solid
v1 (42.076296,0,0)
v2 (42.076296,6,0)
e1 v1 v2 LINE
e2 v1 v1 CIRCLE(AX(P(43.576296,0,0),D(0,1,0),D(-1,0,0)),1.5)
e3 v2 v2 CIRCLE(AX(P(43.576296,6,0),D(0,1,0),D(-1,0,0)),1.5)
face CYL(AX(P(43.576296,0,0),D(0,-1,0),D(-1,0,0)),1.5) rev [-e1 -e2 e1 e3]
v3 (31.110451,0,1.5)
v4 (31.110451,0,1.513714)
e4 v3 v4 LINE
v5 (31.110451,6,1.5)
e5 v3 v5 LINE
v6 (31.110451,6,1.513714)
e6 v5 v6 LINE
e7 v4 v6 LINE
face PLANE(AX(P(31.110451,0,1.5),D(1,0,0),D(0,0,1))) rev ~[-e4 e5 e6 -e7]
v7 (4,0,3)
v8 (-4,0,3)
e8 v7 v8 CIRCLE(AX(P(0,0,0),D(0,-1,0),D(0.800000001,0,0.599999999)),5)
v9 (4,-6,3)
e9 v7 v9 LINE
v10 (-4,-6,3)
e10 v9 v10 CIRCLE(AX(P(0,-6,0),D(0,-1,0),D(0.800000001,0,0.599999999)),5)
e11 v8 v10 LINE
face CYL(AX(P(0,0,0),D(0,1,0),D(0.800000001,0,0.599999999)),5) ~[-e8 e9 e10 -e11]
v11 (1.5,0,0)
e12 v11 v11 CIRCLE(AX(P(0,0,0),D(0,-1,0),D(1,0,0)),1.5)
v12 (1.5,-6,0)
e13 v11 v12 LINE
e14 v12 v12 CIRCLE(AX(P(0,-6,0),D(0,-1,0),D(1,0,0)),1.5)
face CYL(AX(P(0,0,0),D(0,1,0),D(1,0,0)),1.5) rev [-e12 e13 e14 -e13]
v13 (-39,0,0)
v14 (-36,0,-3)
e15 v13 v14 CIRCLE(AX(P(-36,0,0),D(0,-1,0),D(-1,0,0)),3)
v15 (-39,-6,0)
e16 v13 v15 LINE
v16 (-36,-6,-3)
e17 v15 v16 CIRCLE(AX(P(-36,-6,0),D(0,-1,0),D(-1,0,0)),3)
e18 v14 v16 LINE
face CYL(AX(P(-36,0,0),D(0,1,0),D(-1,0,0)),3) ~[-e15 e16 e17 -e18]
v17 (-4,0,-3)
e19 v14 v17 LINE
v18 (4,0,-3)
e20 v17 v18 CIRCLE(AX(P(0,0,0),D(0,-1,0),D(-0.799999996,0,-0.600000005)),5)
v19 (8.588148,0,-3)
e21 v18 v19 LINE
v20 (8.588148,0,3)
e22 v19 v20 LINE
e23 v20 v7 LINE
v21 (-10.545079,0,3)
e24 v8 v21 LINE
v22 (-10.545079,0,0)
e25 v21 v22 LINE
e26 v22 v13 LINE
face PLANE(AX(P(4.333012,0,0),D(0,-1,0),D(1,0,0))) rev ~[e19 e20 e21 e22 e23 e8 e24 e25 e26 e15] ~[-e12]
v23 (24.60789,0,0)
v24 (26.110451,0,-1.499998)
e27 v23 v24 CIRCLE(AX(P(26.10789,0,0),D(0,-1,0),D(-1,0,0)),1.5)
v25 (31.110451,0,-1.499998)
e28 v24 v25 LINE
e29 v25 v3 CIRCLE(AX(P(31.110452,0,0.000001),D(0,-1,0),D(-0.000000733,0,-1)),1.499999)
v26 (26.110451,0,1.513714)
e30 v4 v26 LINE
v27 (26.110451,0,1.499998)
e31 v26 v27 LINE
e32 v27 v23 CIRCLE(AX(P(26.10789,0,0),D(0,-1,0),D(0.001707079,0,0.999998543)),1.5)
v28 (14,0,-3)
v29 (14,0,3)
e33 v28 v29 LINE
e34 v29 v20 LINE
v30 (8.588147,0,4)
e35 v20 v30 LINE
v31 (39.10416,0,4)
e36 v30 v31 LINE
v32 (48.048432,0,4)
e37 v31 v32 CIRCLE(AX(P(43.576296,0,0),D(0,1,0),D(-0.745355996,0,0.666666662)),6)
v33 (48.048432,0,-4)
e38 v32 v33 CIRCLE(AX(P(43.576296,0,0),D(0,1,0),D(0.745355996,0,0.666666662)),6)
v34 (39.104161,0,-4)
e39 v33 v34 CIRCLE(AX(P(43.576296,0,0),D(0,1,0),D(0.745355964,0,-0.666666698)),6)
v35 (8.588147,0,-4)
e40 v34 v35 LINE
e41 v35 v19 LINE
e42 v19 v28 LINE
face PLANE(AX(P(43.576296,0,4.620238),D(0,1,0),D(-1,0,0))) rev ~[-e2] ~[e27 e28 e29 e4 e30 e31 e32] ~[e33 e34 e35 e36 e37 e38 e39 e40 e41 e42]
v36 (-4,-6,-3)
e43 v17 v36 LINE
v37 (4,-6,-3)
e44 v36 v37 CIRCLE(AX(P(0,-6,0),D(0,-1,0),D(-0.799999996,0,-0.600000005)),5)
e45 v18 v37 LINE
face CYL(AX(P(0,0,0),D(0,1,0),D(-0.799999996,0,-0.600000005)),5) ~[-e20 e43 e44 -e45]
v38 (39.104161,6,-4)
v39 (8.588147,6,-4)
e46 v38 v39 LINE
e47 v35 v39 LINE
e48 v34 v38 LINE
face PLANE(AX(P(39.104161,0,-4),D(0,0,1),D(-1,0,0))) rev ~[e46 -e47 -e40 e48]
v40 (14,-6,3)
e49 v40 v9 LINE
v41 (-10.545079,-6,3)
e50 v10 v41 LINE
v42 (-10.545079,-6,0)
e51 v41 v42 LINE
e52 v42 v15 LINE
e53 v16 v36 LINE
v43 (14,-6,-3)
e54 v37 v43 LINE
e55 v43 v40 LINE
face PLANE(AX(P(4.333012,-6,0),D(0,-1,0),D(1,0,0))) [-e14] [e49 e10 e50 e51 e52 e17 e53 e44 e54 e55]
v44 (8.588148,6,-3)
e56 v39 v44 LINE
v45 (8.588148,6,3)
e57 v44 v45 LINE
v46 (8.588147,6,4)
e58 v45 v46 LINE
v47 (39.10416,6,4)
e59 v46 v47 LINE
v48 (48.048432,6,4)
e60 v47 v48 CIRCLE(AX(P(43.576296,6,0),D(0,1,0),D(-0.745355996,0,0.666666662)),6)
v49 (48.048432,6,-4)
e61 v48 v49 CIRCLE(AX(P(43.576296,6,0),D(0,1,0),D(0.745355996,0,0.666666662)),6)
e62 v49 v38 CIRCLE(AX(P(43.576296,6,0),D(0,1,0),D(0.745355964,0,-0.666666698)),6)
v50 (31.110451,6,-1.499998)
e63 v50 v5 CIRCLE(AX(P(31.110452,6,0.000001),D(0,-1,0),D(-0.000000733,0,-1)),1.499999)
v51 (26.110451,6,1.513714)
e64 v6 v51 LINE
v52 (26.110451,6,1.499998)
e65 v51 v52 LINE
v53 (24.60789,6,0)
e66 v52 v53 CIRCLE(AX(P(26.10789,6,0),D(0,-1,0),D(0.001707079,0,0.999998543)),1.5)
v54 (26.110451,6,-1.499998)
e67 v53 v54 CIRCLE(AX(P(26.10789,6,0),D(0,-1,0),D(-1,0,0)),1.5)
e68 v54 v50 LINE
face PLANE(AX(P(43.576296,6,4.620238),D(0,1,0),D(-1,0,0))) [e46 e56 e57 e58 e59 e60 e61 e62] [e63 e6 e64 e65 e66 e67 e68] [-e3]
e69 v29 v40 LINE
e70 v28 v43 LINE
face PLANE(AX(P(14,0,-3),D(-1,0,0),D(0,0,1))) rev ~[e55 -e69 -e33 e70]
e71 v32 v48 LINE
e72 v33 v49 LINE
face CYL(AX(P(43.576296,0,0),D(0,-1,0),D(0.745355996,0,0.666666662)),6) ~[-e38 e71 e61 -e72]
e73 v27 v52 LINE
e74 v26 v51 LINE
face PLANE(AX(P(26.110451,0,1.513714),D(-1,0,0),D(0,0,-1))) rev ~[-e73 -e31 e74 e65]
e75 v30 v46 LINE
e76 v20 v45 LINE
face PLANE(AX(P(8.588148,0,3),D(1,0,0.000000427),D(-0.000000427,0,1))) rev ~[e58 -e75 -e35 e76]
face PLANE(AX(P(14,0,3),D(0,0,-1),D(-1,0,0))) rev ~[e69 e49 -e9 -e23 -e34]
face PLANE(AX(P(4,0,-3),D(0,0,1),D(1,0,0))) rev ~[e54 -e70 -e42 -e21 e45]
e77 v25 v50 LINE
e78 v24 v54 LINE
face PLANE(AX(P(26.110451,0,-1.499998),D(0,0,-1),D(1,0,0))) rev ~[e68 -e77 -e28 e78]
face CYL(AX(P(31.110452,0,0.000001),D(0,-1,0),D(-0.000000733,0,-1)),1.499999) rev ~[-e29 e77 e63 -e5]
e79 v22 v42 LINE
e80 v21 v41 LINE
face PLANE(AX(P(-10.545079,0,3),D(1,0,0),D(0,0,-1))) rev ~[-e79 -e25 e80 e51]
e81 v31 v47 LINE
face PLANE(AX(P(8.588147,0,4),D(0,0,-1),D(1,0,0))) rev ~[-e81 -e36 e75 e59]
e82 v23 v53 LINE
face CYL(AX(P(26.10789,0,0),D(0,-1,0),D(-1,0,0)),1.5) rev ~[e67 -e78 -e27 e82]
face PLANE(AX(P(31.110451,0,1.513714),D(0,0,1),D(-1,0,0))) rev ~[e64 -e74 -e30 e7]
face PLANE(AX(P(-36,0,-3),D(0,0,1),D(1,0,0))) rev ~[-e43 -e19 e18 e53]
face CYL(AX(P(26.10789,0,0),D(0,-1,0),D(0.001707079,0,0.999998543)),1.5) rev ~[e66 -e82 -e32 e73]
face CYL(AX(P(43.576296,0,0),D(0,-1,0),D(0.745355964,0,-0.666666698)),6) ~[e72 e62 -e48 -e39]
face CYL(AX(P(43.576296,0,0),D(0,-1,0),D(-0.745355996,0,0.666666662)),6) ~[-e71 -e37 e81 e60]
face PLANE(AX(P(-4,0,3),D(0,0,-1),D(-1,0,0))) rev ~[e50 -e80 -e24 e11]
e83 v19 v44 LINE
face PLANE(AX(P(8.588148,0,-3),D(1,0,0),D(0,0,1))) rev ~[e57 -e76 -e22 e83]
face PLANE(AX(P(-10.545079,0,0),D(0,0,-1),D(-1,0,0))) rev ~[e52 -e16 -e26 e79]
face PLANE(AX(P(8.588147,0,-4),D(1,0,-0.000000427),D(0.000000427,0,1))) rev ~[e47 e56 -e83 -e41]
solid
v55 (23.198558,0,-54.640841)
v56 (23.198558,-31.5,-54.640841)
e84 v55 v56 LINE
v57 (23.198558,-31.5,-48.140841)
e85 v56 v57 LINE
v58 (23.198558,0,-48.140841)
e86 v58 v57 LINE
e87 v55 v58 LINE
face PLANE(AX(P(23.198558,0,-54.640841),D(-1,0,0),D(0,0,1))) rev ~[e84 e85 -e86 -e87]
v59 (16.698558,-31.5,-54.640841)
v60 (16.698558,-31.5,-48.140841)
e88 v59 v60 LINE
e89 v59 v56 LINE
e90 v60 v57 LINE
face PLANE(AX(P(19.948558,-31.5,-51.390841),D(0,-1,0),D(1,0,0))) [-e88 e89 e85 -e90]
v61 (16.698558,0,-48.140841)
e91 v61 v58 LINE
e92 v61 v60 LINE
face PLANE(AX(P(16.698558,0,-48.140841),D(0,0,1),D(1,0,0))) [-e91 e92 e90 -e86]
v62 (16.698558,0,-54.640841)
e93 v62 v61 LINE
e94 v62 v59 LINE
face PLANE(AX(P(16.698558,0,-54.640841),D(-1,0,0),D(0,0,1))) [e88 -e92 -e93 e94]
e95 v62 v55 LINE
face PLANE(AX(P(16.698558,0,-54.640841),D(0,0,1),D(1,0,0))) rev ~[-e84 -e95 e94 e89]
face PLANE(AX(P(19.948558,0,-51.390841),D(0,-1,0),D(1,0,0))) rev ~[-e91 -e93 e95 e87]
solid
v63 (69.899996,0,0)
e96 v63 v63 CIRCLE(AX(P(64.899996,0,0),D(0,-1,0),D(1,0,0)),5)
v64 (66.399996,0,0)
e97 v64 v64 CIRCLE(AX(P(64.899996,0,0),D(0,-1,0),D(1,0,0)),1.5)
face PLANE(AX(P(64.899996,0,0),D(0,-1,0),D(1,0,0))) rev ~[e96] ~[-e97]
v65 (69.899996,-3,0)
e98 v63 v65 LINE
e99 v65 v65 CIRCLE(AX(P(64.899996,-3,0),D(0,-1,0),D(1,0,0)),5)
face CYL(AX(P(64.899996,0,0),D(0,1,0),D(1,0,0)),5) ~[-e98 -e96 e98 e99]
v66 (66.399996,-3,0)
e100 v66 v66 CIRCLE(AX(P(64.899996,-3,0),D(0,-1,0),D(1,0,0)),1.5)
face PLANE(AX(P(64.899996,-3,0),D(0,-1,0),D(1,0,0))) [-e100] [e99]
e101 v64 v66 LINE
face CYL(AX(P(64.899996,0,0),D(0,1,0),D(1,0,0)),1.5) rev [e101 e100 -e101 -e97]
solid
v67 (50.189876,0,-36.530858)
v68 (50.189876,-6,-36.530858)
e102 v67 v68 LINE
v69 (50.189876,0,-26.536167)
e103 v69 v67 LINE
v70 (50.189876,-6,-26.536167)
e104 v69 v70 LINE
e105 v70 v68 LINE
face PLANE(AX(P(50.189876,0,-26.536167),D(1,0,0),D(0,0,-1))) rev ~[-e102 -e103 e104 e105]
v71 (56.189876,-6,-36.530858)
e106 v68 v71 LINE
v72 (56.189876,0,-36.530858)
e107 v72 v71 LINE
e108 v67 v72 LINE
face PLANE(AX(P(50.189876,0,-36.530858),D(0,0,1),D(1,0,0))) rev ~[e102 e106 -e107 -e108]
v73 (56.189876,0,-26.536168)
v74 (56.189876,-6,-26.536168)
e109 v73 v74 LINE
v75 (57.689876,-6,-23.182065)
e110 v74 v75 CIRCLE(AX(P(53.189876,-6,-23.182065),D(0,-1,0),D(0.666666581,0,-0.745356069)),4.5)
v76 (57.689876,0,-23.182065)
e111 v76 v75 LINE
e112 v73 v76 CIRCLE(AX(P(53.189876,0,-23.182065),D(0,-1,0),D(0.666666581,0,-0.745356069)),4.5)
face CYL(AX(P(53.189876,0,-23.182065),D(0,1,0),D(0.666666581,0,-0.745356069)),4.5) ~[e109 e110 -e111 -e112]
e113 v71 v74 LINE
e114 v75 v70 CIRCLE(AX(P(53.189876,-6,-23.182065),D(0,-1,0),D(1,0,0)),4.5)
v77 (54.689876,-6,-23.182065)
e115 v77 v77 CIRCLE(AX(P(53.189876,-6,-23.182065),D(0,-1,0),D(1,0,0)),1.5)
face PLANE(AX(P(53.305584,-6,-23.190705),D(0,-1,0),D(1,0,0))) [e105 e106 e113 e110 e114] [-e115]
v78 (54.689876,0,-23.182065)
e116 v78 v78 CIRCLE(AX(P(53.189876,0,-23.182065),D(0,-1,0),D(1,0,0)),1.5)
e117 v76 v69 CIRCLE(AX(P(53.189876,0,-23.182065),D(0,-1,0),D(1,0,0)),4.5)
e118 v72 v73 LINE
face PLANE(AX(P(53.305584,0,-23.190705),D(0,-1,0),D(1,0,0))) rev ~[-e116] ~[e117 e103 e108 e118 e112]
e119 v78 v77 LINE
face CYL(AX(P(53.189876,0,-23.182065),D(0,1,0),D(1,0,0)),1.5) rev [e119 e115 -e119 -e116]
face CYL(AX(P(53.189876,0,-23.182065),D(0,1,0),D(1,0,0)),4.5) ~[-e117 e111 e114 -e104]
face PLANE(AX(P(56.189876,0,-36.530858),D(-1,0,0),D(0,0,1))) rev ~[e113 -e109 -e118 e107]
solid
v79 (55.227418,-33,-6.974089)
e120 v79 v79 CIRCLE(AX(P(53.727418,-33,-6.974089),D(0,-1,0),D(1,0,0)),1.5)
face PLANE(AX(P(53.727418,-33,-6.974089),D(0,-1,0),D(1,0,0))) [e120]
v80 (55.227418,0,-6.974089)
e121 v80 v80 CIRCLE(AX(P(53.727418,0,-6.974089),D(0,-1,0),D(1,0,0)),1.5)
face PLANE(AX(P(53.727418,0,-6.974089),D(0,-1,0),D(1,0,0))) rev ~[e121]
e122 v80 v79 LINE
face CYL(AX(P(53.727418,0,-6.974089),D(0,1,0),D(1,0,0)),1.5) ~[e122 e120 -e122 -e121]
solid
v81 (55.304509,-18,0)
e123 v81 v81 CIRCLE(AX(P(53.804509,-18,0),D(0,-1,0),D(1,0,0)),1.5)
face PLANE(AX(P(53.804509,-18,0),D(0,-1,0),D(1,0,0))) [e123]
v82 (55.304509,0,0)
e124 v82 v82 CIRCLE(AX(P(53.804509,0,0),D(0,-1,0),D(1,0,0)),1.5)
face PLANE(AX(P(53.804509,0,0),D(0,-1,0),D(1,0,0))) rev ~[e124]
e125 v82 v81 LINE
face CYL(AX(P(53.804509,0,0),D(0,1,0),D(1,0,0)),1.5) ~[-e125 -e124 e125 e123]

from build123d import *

# Parameters (mm, degrees)
F0_R      = 1.5
F1_DEPTH  = 6
F2_R      = 1.5
F2_W      = 5.4118521512
F2_H      = 6
F3_DEPTH  = 6
F4_R      = 5
F4_R_2    = 1.5
F5_DEPTH  = 3
F6_R      = 1.5
F7_DEPTH  = 18
F8_R      = 1.5
F9_DEPTH  = 33
F10_R     = 1.5
F10_W     = 6
F10_H     = 6
F11_DEPTH = 6
F12_DEPTH = 6
F13_W     = 6.5
F13_H     = 6.5
F14_DEPTH = 31.5


# Not quite as in the source:
# - ends of sketch curves that miss each other by under 0.0002 mm in the source are joined


with BuildPart() as f1:
    # F0 (on Front) → F1 (new body)
    with BuildSketch(Plane.XZ):
        with BuildLine():
            ThreePointArc((3.9999999804, -3.0000000261), (4.7434164851, -1.5811388455), (5, 0))
            ThreePointArc((5, 0), (4.7434164917, 1.5811388258), (4.0000000055, 2.9999999927))
            Line((3.9999999804, 2.9999999739), (3.9999999804, -3.0000000261))
        make_face()
        with BuildLine():
            ThreePointArc((4.0000000055, 2.9999999927), (4.7434164917, 1.5811388258), (5, 0))
            ThreePointArc((5, 0), (4.7434164851, -1.5811388455), (3.9999999804, -3.0000000261))
            Line((3.9999999804, -3.0000000261), (13.9999999804, -3.0000000261))
            Line((13.9999999804, -3.0000000261), (13.9999999804, 2.9999999739))
            Line((13.9999999804, 2.9999999739), (3.9999999804, 2.9999999739))
        make_face()
        with BuildLine():
            Line((3.9999999804, -3.0000000261), (3.9999999804, 2.9999999739))
            ThreePointArc((4.0000000055, 2.9999999927), (2.09e-08, 5), (-3.9999999804, 3.0000000261))
            Line((-3.9999999804, 3.0000000261), (-3.9999999804, -3.0000000261))
            ThreePointArc((-3.9999999804, -3.0000000261), (0, -5), (3.9999999804, -3.0000000261))
        make_face()
        Circle(F0_R, mode=Mode.SUBTRACT)
        with BuildLine():
            Line((-3.9999999804, -3.0000000261), (-3.9999999804, 3.0000000261))
            ThreePointArc((-3.9999999804, 3.0000000261), (-5, 0), (-3.9999999804, -3.0000000261))
        make_face()
        with BuildLine():
            ThreePointArc((-3.9999999804, -3.0000000261), (-5, 0), (-3.9999999804, 3.0000000261))
            Line((-3.9999999804, 3.0000000261), (-10.545078665, 3.0000000261))
            Line((-10.545078665, 3.0000000261), (-10.545078665, 0))
            Line((-10.545078665, 0), (-38.9999999804, 0))
            ThreePointArc((-38.9999999804, -2.61e-08), (-38.121320324, -2.1213203696), (-35.9999999804, -3.0000000261))
            Line((-35.9999999804, -3.0000000261), (-3.9999999804, -3.0000000261))
        make_face()
    extrude(amount=F1_DEPTH)

    # F2 (on face) → F3 (join)
    with BuildSketch(Plane(origin=(0, 0, 0), x_dir=(-1, 0, 0), z_dir=(0, 1, 0))):
        with BuildLine():
            ThreePointArc((-39.1041604406, 3.9999999739), (-43.5762964189, 6), (-48.0484323972, 3.9999999739))
            Line((-48.0484323972, 3.9999999739), (-39.1041604406, 3.9999999739))
        make_face()
        with BuildLine():
            Line((-39.1041606338, -4.00000019), (-48.048432204, -4.00000019))
            ThreePointArc((-48.048432204, -4.00000019), (-43.5762964189, -6), (-39.1041606338, -4.00000019))
        make_face()
        with BuildLine():
            Line((-39.1041604406, 3.9999999739), (-48.0484323972, 3.9999999739))
            ThreePointArc((-48.0484323972, 3.9999999739), (-49.5762964189, -1.449e-07), (-48.048432204, -4.00000019))
            Line((-48.048432204, -4.00000019), (-39.1041606338, -4.00000019))
            ThreePointArc((-39.1041606338, -4.00000019), (-37.9712623106, -2.1409326577), (-37.5762964189, 0))
            ThreePointArc((-37.5762964189, 0), (-37.9712622589, 2.1409325223), (-39.1041604406, 3.9999999739))
        make_face()
        with Locations((-43.5762964189, 0)):
            Circle(F2_R, mode=Mode.SUBTRACT)
        with Locations((-11.2940739049, -2.61e-08)):
            Rectangle(F2_W, F2_H)
        with BuildLine():
            Line((-8.5881474018, 3.9999999739), (-39.1041604406, 3.9999999739))
            ThreePointArc((-39.1041604406, 3.9999999739), (-37.9712622589, 2.1409325223), (-37.5762964189, 0))
            ThreePointArc((-37.5762964189, 0), (-37.9712623106, -2.1409326577), (-39.1041606338, -4.00000019))
            Line((-39.1041606338, -4.00000019), (-14.5881475508, -4.00000019))
            Line((-14.5881475508, -4.00000019), (-8.5881474018, -4.00000019))
            Line((-8.5881474018, -4.00000019), (-8.5881478293, -3.0000000261))
            Line((-8.5881478293, -3.0000000261), (-13.9999999804, -3.0000000261))
            Line((-13.9999999804, -3.0000000261), (-13.9999999804, 2.9999999739))
            Line((-13.9999999804, 2.9999999739), (-8.5881478293, 2.9999999739))
            Line((-8.5881478293, 2.9999999739), (-8.5881474018, 3.9999999739))
        make_face()
        with BuildLine():
            ThreePointArc((-24.6078900066, 1.33e-08), (-25.048135537, -1.061565088), (-26.1104506254, -1.4999978011))
            Line((-26.1104506254, -1.4999978011), (-31.1104506254, -1.4999978011))
            ThreePointArc((-31.1104506254, -1.4999978011), (-32.6104506254, 0), (-31.1104506254, 1.5))
            Line((-31.1104506254, 1.5), (-31.1104506254, 1.5137138676))
            Line((-31.1104506254, 1.5137138676), (-26.1104506254, 1.5137138676))
            Line((-26.1104506254, 1.5137138676), (-26.1104506254, 1.4999978277))
            ThreePointArc((-26.1104506254, 1.4999978277), (-25.048135537, 1.0615651145), (-24.6078900066, 1.33e-08))
        make_face(mode=Mode.SUBTRACT)
    extrude(amount=F3_DEPTH)


with BuildPart() as f5:
    # F4 (on Front) → F5 (new body)
    with BuildSketch(Plane.XZ):
        with Locations((64.899995923, 0)):
            Circle(F4_R)
        with Locations((64.899995923, 0)):
            Circle(F4_R_2, mode=Mode.SUBTRACT)
    extrude(amount=F5_DEPTH)


with BuildPart() as f7:
    # F6 (on Front) → F7 (new body)
    with BuildSketch(Plane.XZ):
        with Locations((53.8045093417, 0)):
            Circle(F6_R)
    extrude(amount=F7_DEPTH)


with BuildPart() as f9:
    # F8 (on Front) → F9 (new body)
    with BuildSketch(Plane.XZ):
        with Locations((53.7274181843, -6.9740889594)):
            Circle(F8_R)
    extrude(amount=F9_DEPTH)


with BuildPart() as f11:
    # F10 (on Front) → F11 (new body)
    with BuildSketch(Plane.XZ):
        with BuildLine():
            ThreePointArc((56.1898760498, -26.5361675613), (57.2977955124, -25.0191827928), (57.6898764372, -23.1820652485))
            ThreePointArc((57.6898764372, -23.1820652485), (51.3527593674, -19.0741459611), (50.1898760498, -26.5361668682))
            Line((50.1898760498, -26.5361668682), (50.1898760498, -26.5308583975))
            Line((50.1898760498, -26.5308583975), (56.1898760498, -26.5308583975))
            Line((56.1898760498, -26.5308583975), (56.1898760498, -26.5361675613))
        make_face()
        with Locations((53.1898764372, -23.1820652485)):
            Circle(F10_R, mode=Mode.SUBTRACT)
        with BuildLine():
            Line((50.1898760498, -26.5308583975), (50.1898760498, -26.5361668682))
            ThreePointArc((50.1898760498, -26.5361668682), (53.1898759174, -27.6820652485), (56.1898760498, -26.5361675613))
            Line((56.1898760498, -26.5361675613), (56.1898760498, -26.5308583975))
            Line((56.1898760498, -26.5308583975), (50.1898760498, -26.5308583975))
        make_face()
        with BuildLine():
            ThreePointArc((56.1898760498, -26.5361675613), (53.1898759174, -27.6820652485), (50.1898760498, -26.5361668682))
            Line((50.1898760498, -26.5361668682), (50.1898760498, -30.5308583975))
            Line((50.1898760498, -30.5308583975), (56.1898760498, -30.5308583975))
            Line((56.1898760498, -30.5308583975), (56.1898760498, -26.5361675613))
        make_face()
        with Locations((53.1898760498, -33.5308583975)):
            Rectangle(F10_W, F10_H)
    extrude(amount=F11_DEPTH)

    # F10 (on Front) → F12 (join)
    with BuildSketch(Plane.XZ):
        with BuildLine():
            ThreePointArc((56.1898760498, -26.5361675613), (57.2977955124, -25.0191827928), (57.6898764372, -23.1820652485))
            ThreePointArc((57.6898764372, -23.1820652485), (51.3527593674, -19.0741459611), (50.1898760498, -26.5361668682))
            Line((50.1898760498, -26.5361668682), (50.1898760498, -26.5308583975))
            Line((50.1898760498, -26.5308583975), (56.1898760498, -26.5308583975))
            Line((56.1898760498, -26.5308583975), (56.1898760498, -26.5361675613))
        make_face()
        with Locations((53.1898764372, -23.1820652485)):
            Circle(F10_R, mode=Mode.SUBTRACT)
        with BuildLine():
            Line((50.1898760498, -26.5308583975), (50.1898760498, -26.5361668682))
            ThreePointArc((50.1898760498, -26.5361668682), (53.1898759174, -27.6820652485), (56.1898760498, -26.5361675613))
            Line((56.1898760498, -26.5361675613), (56.1898760498, -26.5308583975))
            Line((56.1898760498, -26.5308583975), (50.1898760498, -26.5308583975))
        make_face()
        with BuildLine():
            ThreePointArc((56.1898760498, -26.5361675613), (53.1898759174, -27.6820652485), (50.1898760498, -26.5361668682))
            Line((50.1898760498, -26.5361668682), (50.1898760498, -30.5308583975))
            Line((50.1898760498, -30.5308583975), (56.1898760498, -30.5308583975))
            Line((56.1898760498, -30.5308583975), (56.1898760498, -26.5361675613))
        make_face()
        with Locations((53.1898760498, -33.5308583975)):
            Rectangle(F10_W, F10_H)
    extrude(amount=F12_DEPTH)


with BuildPart() as f14:
    # F13 (on Front) → F14 (new body)
    with BuildSketch(Plane.XZ):
        with Locations((19.9485578835, -51.390840739)):
            Rectangle(F13_W, F13_H)
    extrude(amount=F14_DEPTH)


solid = Compound([f1.part, f5.part, f7.part, f9.part, f11.part, f14.part])
